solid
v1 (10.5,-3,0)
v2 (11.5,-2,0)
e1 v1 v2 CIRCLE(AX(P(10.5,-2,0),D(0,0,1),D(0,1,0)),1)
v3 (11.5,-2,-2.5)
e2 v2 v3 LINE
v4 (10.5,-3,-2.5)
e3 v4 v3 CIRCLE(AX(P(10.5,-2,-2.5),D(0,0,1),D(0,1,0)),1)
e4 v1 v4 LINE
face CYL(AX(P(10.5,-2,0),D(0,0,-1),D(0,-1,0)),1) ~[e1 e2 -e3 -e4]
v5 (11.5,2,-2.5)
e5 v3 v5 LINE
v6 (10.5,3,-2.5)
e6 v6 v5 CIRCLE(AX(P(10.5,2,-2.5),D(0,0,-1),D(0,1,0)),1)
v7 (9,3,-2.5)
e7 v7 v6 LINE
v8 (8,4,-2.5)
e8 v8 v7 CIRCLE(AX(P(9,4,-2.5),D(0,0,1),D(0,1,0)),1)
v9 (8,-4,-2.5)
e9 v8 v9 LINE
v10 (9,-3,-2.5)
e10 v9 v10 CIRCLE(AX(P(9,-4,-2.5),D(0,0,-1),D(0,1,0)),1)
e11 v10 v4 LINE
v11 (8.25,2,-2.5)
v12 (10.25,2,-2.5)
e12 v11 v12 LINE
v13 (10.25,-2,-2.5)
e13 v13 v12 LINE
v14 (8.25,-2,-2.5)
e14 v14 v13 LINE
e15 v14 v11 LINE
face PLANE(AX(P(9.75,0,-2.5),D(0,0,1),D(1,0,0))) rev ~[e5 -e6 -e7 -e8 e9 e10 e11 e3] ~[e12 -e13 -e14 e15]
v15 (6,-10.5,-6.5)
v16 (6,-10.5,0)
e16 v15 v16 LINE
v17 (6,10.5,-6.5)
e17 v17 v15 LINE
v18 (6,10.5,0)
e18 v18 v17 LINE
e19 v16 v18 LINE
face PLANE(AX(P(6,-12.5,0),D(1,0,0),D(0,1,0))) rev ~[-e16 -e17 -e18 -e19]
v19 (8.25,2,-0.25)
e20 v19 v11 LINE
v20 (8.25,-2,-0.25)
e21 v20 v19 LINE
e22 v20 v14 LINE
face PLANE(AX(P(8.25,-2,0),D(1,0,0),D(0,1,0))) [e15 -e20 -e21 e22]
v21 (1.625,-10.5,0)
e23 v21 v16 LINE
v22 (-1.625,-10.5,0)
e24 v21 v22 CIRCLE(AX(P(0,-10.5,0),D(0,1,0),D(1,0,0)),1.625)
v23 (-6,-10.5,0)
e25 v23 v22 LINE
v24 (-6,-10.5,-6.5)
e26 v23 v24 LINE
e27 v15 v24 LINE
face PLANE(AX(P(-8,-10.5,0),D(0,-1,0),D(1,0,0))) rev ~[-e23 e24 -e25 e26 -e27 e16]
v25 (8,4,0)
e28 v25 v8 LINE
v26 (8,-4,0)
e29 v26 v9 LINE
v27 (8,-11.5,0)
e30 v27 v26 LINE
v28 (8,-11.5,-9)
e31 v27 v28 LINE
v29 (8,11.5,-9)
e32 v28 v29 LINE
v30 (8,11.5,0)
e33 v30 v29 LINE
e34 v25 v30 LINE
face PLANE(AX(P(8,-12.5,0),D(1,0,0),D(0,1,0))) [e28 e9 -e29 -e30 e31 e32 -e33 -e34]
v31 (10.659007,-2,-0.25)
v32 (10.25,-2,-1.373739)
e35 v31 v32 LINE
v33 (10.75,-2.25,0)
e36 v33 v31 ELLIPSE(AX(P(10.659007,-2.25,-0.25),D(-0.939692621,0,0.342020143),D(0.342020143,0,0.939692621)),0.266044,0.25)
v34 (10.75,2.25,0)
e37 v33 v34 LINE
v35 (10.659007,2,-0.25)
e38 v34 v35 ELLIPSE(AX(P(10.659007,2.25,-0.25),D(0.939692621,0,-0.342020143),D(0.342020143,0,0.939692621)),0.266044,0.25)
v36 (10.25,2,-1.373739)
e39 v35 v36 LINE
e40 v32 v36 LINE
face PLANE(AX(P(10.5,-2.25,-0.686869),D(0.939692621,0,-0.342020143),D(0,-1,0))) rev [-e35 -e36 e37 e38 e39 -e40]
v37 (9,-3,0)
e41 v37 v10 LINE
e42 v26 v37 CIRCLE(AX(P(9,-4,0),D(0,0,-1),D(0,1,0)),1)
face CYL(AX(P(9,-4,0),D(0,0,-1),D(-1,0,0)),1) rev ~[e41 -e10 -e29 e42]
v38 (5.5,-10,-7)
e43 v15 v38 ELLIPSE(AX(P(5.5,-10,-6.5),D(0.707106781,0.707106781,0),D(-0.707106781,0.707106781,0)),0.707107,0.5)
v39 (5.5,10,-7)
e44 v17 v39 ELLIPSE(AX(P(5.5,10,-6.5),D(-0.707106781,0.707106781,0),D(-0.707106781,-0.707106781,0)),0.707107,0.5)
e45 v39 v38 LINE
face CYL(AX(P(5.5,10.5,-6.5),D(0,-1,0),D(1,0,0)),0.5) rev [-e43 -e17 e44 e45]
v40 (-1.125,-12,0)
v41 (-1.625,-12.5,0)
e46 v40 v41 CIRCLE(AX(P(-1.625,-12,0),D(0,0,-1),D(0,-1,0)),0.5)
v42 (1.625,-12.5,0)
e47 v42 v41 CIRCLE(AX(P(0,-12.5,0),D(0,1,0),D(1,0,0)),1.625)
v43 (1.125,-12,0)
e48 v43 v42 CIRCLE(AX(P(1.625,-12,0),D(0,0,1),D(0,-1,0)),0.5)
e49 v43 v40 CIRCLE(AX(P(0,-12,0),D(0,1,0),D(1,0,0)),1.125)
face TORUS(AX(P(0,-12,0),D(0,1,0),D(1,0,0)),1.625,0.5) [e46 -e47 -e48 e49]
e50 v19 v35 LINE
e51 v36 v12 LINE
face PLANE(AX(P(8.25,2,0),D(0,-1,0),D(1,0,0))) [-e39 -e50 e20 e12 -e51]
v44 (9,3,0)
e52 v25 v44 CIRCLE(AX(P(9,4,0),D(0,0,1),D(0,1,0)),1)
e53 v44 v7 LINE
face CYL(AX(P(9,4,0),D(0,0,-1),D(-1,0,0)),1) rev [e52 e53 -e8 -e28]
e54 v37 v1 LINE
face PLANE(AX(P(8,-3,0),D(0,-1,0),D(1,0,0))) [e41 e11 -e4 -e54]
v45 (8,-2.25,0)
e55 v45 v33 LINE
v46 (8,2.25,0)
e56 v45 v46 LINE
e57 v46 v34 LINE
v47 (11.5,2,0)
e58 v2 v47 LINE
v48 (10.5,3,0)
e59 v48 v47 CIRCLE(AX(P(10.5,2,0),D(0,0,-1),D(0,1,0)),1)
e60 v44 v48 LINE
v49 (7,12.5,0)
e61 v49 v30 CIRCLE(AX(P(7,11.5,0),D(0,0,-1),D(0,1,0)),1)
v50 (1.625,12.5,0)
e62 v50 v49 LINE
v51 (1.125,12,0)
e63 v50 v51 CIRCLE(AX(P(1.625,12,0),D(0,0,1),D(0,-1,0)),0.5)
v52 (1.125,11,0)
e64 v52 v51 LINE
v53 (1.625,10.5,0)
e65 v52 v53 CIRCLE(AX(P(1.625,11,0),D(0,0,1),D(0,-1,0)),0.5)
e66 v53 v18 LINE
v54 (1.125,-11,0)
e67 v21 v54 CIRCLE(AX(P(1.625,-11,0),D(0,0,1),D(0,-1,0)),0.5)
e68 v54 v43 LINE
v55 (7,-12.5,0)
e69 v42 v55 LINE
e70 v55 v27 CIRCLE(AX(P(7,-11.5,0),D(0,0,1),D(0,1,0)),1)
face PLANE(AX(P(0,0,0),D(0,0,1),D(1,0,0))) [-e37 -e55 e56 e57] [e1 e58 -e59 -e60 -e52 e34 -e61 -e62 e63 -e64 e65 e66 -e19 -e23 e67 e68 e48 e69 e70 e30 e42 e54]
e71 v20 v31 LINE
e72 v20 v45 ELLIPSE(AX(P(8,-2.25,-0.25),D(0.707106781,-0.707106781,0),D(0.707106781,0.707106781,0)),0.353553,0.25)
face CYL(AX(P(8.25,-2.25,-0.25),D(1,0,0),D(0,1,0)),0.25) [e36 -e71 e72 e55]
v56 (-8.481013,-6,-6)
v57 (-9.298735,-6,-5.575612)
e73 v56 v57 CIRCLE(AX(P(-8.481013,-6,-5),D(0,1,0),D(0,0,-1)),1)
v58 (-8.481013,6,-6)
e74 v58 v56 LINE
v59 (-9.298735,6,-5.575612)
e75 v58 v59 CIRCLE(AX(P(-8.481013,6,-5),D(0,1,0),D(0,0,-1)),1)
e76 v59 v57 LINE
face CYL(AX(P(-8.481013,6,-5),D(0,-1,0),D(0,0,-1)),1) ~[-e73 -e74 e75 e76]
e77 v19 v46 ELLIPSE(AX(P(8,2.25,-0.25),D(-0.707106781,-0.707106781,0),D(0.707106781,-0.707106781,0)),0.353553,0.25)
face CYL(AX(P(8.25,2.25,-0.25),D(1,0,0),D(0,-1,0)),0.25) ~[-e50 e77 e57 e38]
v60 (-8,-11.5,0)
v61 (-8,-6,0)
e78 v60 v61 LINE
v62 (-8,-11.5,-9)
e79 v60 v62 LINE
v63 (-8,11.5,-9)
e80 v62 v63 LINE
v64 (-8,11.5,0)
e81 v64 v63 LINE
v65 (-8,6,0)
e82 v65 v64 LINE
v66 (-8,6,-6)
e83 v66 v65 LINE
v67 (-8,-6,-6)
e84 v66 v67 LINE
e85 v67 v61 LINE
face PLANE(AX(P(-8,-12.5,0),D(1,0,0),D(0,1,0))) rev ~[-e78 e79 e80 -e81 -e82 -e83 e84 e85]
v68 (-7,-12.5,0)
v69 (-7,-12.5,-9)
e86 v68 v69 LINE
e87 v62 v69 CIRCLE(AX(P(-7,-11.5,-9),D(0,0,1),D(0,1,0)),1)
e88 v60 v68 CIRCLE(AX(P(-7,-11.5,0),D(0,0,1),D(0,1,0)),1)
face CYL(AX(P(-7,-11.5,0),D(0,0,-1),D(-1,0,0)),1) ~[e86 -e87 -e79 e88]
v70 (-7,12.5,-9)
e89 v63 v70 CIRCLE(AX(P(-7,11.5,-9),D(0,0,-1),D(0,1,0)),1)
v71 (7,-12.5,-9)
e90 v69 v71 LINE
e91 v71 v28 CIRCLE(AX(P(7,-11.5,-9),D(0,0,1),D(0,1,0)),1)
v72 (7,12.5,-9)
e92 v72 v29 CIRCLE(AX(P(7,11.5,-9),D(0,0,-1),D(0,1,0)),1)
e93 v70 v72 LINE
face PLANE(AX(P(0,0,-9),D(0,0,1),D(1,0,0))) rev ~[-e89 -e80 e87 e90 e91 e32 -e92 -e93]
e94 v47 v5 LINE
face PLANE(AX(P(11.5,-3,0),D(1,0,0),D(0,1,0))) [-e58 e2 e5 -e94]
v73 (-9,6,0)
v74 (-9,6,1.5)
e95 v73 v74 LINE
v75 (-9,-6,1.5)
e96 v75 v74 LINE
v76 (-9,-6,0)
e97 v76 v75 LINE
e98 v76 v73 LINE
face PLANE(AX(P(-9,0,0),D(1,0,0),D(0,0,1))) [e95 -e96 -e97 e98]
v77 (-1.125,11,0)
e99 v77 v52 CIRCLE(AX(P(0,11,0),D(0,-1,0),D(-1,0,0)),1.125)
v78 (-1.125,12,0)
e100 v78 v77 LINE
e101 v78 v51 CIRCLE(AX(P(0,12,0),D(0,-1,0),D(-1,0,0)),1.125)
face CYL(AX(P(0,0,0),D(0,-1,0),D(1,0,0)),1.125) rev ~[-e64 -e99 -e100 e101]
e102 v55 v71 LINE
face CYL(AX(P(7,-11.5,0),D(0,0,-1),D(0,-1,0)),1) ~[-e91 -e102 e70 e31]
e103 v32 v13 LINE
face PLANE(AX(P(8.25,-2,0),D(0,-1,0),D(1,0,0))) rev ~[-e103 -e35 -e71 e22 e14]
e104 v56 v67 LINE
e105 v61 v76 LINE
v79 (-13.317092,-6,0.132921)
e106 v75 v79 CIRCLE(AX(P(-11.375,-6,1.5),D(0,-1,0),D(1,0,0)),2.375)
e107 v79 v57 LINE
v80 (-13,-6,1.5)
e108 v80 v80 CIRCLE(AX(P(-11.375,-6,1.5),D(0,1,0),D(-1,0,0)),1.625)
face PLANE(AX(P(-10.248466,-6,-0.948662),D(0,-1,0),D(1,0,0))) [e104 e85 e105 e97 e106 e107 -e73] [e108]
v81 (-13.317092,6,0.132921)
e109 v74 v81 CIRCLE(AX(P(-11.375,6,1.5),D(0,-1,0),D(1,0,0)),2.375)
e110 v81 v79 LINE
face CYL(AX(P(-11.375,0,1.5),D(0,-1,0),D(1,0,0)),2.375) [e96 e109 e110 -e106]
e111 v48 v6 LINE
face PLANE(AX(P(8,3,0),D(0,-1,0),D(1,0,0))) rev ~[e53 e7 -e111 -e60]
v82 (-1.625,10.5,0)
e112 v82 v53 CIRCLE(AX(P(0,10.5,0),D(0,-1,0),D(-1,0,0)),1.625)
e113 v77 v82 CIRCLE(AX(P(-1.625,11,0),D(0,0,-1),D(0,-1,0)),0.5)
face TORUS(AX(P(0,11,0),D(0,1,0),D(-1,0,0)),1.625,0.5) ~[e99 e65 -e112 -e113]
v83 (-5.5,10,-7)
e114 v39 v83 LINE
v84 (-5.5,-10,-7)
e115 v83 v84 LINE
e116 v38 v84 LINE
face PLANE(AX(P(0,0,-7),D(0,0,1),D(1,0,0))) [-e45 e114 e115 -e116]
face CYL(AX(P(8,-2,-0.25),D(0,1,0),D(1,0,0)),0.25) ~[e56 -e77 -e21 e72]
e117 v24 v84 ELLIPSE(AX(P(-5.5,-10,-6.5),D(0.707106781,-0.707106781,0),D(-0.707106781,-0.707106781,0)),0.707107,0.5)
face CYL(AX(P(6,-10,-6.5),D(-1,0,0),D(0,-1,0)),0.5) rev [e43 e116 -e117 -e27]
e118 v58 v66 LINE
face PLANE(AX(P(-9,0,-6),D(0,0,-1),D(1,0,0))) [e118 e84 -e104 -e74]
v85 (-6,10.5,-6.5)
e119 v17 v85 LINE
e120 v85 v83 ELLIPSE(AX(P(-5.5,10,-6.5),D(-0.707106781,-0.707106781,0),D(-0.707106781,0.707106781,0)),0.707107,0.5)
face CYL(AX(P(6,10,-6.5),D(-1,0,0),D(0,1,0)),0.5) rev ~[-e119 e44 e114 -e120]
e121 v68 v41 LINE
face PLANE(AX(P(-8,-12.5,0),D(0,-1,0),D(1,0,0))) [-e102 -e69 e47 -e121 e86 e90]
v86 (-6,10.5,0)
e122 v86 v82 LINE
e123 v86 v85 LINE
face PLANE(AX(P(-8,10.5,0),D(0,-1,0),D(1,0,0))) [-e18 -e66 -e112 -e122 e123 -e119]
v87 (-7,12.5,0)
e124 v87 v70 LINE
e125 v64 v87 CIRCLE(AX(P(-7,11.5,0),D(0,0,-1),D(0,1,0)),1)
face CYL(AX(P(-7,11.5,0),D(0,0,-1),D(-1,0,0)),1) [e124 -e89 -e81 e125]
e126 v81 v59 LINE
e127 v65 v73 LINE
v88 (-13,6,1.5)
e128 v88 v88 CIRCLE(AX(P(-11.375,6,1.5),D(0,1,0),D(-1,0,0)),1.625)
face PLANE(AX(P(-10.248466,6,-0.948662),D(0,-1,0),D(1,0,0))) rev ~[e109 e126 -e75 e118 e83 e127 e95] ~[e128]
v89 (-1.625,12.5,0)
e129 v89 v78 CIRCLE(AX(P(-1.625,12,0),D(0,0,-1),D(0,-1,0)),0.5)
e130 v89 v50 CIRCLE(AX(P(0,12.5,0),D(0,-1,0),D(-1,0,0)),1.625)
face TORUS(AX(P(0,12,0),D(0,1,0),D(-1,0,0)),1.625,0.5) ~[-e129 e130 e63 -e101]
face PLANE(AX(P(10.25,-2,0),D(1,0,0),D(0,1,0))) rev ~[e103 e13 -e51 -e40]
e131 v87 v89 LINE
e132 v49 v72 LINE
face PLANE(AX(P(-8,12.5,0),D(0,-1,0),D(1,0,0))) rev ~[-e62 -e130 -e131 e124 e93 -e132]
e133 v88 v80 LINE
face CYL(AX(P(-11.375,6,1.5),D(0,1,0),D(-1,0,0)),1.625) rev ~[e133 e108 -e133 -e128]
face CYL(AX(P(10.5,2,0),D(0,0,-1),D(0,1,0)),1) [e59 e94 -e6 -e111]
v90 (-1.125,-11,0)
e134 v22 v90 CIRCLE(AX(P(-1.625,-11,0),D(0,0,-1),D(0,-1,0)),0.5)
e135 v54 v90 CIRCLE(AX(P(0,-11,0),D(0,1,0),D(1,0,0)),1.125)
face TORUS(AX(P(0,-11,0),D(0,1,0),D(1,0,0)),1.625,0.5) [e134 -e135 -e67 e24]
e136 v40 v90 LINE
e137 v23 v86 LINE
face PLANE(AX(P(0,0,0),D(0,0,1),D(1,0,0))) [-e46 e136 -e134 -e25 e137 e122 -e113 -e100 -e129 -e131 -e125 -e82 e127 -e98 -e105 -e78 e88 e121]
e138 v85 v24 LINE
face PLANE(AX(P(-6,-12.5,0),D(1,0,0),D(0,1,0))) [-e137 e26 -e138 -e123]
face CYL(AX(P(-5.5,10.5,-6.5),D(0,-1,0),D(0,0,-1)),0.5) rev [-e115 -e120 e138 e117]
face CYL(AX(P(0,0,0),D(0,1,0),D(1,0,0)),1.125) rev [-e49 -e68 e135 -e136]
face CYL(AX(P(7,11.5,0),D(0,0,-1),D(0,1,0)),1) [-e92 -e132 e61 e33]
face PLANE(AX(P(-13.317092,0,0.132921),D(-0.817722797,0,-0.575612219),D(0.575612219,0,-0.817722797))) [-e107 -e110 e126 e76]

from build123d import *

# Parameters (mm, degrees)
F0_W          = 16
F0_H          = 25
F1_DEPTH      = 9
F2_T          = -2
F4_DEPTH      = 6
F5_R          = 1.625
F6_DEPTH      = 25
F7_R          = 1.125
F8_DEPTH      = 25
F8_DEPTH_BACK = 25
F9_R          = 1
F11_W         = 3.5
F11_H         = 6
F11_W_2       = 2
F11_H_2       = 4
F12_DEPTH     = 2.5
F13_R         = 1
F14_R         = 0.25
F15_SIZE2     = 1.3737387097
F15_SIZE      = 0.5
F16_R         = 0.5
F17_R         = 0.5


# Not quite as in the source:
# - two fillets or chamfers of one size are made in one step


with BuildPart() as f1:
    # F0 (on Top) → F1 (new body)
    with BuildSketch(Plane.XY):
        Rectangle(F0_W, F0_H)
    extrude(amount=-F1_DEPTH)

    # F2
    f2_openings = [f1.faces().sort_by_distance(p)[0] for p in [
        (0, 0, 0),
    ]]
    offset(amount=F2_T, openings=f2_openings)

    # F3 (on Front) → F4 (join, symmetric)
    with BuildSketch(Plane.XZ):
        with BuildLine():
            ThreePointArc((-9, 1.5), (-12.0919927986, 3.7641877852), (-13.3170916435, 0.1329209796))
            Line((-13.3170916435, 0.1329209796), (-9, -6))
            Line((-9, -6), (-8, -6))
            Line((-8, -6), (-8, 0))
            Line((-8, 0), (-9, 0))
            Line((-9, 0), (-9, 1.5))
        make_face()
    extrude(amount=F4_DEPTH, both=True)

    # F5 (on face) → F6 (cut)
    with BuildSketch(Plane(origin=(0, 6, 0), x_dir=(-1, 0, 0), z_dir=(0, 1, 0))):
        with Locations((11.375, 1.5)):
            Circle(F5_R)
    extrude(amount=-F6_DEPTH, mode=Mode.SUBTRACT)

    # F7 (on Front) → F8 (cut, two sides)
    with BuildSketch(Plane.XZ) as f8_sk:
        Circle(F7_R)
    extrude(amount=-F8_DEPTH, mode=Mode.SUBTRACT)
    extrude(f8_sk.sketch, amount=F8_DEPTH_BACK, mode=Mode.SUBTRACT)

    # F9
    f9_edges = [f1.edges().sort_by_distance(p)[0] for p in [
        (8, -12.5, -4.5),
        (8, 12.5, -4.5),
        (-8, -12.5, -4.5),
        (-8, 12.5, -4.5),
        (-9, 0, -6),
    ]]
    fillet(f9_edges, radius=F9_R)

    # F11 (on face) → F12 (join)
    with BuildSketch(Plane.XY):
        with Locations((9.75, 0)):
            Rectangle(F11_W, F11_H)
        with Locations((9.25, 0)):
            Rectangle(F11_W_2, F11_H_2, mode=Mode.SUBTRACT)
    extrude(amount=-F12_DEPTH)

    # F13
    f13_edges = [f1.edges().sort_by_distance(p)[0] for p in [
        (11.5, -3, -1.25),
        (8, -3, -1.25),
        (11.5, 3, -1.25),
        (8, 3, -1.25),
    ]]
    fillet(f13_edges, radius=F13_R)

    # F14
    f14_edges = [f1.edges().sort_by_distance(p)[0] for p in [
        (9.25, 2, 0),
        (8.25, 0, 0),
        (9.25, -2, 0),
    ]]
    fillet(f14_edges, radius=F14_R)

    # F15
    f15_edges = [f1.edges().sort_by_distance(p)[0] for p in [
        (10.25, 0, 0),
    ]]
    f15_side = f1.faces().sort_by_distance((6.594217, 0, 0))[0]
    chamfer(f15_edges, length=F15_SIZE, length2=F15_SIZE2, reference=f15_side)

    # F16
    f16_edges = [f1.edges().sort_by_distance(p)[0] for p in [
        (0, 12.5, -1.125),
        (0, -12.5, -1.125),
    ]]
    fillet(f16_edges, radius=F16_R)

    # F17
    f17_edges = [f1.edges().sort_by_distance(p)[0] for p in [
        (0, 10.5, -1.125),
        (0, 10.5, -7),
        (0, -10.5, -7),
        (6, 0, -7),
        (0, -10.5, -1.125),
        (-6, 0, -7),
    ]]
    fillet(f17_edges, radius=F17_R)


solid = f1.part
